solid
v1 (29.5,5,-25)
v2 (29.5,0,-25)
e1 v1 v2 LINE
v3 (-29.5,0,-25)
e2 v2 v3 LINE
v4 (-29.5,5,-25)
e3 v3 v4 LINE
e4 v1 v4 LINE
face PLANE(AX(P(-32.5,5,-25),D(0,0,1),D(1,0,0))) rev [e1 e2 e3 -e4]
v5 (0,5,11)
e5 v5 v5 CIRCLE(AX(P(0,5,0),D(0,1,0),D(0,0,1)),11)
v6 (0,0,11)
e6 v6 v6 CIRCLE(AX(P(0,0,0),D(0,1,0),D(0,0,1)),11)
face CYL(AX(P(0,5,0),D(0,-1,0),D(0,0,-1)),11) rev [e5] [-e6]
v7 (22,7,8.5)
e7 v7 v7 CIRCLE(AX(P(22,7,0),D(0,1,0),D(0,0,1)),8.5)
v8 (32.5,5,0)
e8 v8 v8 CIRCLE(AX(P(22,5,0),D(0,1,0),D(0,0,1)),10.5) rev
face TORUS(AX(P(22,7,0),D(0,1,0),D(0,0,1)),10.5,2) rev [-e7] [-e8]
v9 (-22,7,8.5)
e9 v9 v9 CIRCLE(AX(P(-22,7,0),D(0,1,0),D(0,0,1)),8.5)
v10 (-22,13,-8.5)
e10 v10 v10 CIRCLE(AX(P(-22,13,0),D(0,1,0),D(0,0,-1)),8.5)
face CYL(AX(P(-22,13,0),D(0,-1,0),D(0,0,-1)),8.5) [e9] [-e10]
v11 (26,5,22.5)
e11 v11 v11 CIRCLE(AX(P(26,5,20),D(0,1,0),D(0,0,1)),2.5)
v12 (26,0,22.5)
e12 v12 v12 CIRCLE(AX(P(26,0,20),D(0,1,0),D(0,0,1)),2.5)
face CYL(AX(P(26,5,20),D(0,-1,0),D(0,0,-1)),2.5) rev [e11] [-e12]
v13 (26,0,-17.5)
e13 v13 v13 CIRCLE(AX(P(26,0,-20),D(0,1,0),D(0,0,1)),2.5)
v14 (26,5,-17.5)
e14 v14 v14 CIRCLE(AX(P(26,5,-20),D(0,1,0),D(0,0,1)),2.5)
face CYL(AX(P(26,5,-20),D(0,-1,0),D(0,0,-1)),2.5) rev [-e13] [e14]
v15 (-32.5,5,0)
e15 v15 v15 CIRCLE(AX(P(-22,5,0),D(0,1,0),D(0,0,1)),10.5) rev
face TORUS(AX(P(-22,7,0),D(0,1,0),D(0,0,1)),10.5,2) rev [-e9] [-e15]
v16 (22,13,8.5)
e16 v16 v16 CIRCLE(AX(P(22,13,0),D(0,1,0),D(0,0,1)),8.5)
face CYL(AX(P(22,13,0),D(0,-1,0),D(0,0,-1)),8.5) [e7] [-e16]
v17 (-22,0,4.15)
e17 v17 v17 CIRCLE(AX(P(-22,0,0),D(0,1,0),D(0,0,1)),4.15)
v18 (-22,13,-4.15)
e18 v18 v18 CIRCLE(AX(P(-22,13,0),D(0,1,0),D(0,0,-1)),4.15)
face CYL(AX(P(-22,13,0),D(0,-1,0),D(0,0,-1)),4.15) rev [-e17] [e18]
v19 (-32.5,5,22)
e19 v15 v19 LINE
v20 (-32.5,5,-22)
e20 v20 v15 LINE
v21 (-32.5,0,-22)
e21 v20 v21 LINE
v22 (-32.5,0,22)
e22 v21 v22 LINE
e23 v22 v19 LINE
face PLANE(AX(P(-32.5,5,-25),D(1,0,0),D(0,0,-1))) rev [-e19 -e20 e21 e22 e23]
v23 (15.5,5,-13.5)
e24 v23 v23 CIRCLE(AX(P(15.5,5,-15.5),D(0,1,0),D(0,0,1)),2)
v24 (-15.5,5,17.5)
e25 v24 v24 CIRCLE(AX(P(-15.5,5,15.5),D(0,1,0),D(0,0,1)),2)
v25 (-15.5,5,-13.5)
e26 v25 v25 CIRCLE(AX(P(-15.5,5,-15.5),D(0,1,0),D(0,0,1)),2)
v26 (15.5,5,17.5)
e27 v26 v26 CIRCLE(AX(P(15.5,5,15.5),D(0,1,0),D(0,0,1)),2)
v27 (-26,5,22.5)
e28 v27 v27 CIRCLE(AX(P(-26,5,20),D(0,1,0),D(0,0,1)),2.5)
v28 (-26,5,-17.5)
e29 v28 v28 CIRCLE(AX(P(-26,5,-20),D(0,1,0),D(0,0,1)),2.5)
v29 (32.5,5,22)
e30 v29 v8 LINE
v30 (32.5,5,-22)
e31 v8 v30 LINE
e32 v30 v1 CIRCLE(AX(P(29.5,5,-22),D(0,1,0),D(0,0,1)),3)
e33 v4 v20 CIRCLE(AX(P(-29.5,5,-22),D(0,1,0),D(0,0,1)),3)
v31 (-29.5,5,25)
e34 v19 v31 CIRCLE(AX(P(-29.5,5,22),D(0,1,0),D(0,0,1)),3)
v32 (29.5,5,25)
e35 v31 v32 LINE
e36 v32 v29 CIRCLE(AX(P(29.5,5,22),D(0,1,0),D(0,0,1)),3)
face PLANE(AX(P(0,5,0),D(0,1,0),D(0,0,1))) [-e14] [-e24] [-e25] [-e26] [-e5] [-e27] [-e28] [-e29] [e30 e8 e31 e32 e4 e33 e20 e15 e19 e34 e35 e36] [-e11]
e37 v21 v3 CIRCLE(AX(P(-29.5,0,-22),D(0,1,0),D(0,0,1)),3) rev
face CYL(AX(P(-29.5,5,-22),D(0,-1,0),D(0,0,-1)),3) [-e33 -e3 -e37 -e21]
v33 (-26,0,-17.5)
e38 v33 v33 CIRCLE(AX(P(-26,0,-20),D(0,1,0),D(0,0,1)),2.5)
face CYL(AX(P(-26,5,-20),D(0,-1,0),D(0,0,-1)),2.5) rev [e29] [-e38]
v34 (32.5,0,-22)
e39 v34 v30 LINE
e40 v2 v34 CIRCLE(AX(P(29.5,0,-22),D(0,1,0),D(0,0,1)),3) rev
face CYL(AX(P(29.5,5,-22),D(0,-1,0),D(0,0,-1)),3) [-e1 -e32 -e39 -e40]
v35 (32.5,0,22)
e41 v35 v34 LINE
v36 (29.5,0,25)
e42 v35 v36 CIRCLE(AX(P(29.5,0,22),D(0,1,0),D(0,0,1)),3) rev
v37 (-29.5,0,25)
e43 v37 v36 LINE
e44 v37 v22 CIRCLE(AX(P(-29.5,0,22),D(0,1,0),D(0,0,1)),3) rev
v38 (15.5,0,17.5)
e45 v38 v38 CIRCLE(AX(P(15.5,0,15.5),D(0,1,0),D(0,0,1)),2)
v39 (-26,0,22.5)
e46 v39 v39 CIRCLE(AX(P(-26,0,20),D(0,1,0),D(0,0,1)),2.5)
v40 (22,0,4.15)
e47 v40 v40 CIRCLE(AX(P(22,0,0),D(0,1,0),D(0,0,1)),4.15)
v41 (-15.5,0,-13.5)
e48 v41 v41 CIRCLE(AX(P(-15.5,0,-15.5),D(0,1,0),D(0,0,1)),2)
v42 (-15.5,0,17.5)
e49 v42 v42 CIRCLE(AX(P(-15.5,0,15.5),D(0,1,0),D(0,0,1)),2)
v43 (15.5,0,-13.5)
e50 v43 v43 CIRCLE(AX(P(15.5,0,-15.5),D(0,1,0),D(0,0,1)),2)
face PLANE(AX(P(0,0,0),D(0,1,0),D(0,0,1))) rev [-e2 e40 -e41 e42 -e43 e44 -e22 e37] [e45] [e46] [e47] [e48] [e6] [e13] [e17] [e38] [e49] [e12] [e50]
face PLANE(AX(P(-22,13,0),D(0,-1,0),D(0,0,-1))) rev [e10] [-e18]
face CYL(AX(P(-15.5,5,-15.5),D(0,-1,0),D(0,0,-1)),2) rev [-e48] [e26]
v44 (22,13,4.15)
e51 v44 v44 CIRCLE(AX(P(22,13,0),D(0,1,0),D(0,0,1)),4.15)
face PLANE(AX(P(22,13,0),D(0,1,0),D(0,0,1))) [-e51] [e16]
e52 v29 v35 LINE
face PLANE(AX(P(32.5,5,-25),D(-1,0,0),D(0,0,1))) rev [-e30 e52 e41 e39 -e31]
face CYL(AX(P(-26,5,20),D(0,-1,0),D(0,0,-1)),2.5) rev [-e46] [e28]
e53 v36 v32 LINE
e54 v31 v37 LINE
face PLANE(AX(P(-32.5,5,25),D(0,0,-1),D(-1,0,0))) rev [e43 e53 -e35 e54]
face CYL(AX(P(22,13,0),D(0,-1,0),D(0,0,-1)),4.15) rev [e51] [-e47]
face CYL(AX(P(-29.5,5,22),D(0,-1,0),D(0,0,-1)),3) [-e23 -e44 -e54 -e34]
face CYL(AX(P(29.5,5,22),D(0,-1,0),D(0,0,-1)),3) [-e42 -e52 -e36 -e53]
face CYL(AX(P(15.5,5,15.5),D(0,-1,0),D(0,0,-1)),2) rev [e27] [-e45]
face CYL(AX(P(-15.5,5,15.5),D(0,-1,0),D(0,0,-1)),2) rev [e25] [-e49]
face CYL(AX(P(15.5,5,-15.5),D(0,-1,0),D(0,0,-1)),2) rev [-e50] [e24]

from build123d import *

# Parameters (mm, degrees)
SKETCH1_W           = 65
SKETCH1_H           = 50
SKETCH1_R           = 11
SKETCH1_R_2         = 2
SKETCH1_R_3         = 2.5
BOSS_EXTRUDE1_DEPTH = 5
SKETCH2_R           = 8.5
SKETCH2_R_2         = 4.15
BOSS_EXTRUDE2_DEPTH = 8
FILLET1_R           = 3
CUT_EXTRUDE1_START  = -8
SKETCH3_R           = 4.15
CUT_EXTRUDE1_DEPTH  = 8
FILLET2_R           = 2


with BuildPart() as part:
    # Sketch1 → Boss-Extrude1 (new body)
    with BuildSketch(Plane(origin=(0, 0, 0), x_dir=(1, 0, 0), z_dir=(0, 1, 0))):
        Rectangle(SKETCH1_W, SKETCH1_H)
        with Locations(Location((0, 0, 0), (0, 0, 270))):
            Circle(SKETCH1_R, mode=Mode.SUBTRACT)
        with Locations(Location((15.5, 15.5, 0), (0, 0, 270))):
            Circle(SKETCH1_R_2, mode=Mode.SUBTRACT)
        with Locations(Location((-15.5, 15.5, 0), (0, 0, 270))):
            Circle(SKETCH1_R_2, mode=Mode.SUBTRACT)
        with Locations(Location((15.5, -15.5, 0), (0, 0, 270))):
            Circle(SKETCH1_R_2, mode=Mode.SUBTRACT)
        with Locations(Location((-15.5, -15.5, 0), (0, 0, 270))):
            Circle(SKETCH1_R_2, mode=Mode.SUBTRACT)
        with Locations(Location((26, 20, 0), (0, 0, 270))):
            Circle(SKETCH1_R_3, mode=Mode.SUBTRACT)
        with Locations(Location((-26, 20, 0), (0, 0, 270))):
            Circle(SKETCH1_R_3, mode=Mode.SUBTRACT)
        with Locations(Location((-26, -20, 0), (0, 0, 270))):
            Circle(SKETCH1_R_3, mode=Mode.SUBTRACT)
        with Locations(Location((26, -20, 0), (0, 0, 270))):
            Circle(SKETCH1_R_3, mode=Mode.SUBTRACT)
    extrude(amount=BOSS_EXTRUDE1_DEPTH)

    # Sketch2 → Boss-Extrude2 (add)
    # profile 1 of 2: a face of its own
    with BuildSketch(Plane(origin=(0, 5, 0), x_dir=(1, 0, 0), z_dir=(0, 1, 0))):
        with Locations(Location((22, 0, 0), (0, 0, 270))):
            Circle(SKETCH2_R)
        with Locations(Location((22, 0, 0), (0, 0, 270))):
            Circle(SKETCH2_R_2, mode=Mode.SUBTRACT)
    # profile 2 of 2: a face of its own
    with BuildSketch(Plane(origin=(0, 5, 0), x_dir=(1, 0, 0), z_dir=(0, 1, 0))):
        with Locations(Location((-22, 0, 0), (0, 0, 90))):
            Circle(SKETCH2_R)
        with Locations(Location((-22, 0, 0), (0, 0, 90))):
            Circle(SKETCH2_R_2, mode=Mode.SUBTRACT)
    extrude(amount=BOSS_EXTRUDE2_DEPTH)

    # Fillet1
    fillet1_edges = [part.edges().sort_by_distance(p)[0] for p in [
        (32.5, 2.5, 25),
        (-32.5, 2.5, 25),
        (-32.5, 2.5, -25),
        (32.5, 2.5, -25),
    ]]
    fillet(fillet1_edges, radius=FILLET1_R)

    # Sketch3 → Cut-Extrude1 (cut)
    with BuildSketch(Plane(origin=(0, 5, 0), x_dir=(1, 0, 0), z_dir=(0, 1, 0)).offset(CUT_EXTRUDE1_START)):
        with Locations(Location((-22, 0, 0), (0, 0, 90))):
            Circle(SKETCH3_R)
        with Locations(Location((22, 0, 0), (0, 0, 270))):
            Circle(SKETCH3_R)
    extrude(amount=CUT_EXTRUDE1_DEPTH, mode=Mode.SUBTRACT)

    # Fillet2
    fillet2_edges = [part.edges().sort_by_distance(p)[0] for p in [
        (22, 5, -8.5),
        (-22, 5, 8.5),
    ]]
    fillet(fillet2_edges, radius=FILLET2_R - 0.0001)  # a hair under: the kernel refuses the full size


solid = part.part
